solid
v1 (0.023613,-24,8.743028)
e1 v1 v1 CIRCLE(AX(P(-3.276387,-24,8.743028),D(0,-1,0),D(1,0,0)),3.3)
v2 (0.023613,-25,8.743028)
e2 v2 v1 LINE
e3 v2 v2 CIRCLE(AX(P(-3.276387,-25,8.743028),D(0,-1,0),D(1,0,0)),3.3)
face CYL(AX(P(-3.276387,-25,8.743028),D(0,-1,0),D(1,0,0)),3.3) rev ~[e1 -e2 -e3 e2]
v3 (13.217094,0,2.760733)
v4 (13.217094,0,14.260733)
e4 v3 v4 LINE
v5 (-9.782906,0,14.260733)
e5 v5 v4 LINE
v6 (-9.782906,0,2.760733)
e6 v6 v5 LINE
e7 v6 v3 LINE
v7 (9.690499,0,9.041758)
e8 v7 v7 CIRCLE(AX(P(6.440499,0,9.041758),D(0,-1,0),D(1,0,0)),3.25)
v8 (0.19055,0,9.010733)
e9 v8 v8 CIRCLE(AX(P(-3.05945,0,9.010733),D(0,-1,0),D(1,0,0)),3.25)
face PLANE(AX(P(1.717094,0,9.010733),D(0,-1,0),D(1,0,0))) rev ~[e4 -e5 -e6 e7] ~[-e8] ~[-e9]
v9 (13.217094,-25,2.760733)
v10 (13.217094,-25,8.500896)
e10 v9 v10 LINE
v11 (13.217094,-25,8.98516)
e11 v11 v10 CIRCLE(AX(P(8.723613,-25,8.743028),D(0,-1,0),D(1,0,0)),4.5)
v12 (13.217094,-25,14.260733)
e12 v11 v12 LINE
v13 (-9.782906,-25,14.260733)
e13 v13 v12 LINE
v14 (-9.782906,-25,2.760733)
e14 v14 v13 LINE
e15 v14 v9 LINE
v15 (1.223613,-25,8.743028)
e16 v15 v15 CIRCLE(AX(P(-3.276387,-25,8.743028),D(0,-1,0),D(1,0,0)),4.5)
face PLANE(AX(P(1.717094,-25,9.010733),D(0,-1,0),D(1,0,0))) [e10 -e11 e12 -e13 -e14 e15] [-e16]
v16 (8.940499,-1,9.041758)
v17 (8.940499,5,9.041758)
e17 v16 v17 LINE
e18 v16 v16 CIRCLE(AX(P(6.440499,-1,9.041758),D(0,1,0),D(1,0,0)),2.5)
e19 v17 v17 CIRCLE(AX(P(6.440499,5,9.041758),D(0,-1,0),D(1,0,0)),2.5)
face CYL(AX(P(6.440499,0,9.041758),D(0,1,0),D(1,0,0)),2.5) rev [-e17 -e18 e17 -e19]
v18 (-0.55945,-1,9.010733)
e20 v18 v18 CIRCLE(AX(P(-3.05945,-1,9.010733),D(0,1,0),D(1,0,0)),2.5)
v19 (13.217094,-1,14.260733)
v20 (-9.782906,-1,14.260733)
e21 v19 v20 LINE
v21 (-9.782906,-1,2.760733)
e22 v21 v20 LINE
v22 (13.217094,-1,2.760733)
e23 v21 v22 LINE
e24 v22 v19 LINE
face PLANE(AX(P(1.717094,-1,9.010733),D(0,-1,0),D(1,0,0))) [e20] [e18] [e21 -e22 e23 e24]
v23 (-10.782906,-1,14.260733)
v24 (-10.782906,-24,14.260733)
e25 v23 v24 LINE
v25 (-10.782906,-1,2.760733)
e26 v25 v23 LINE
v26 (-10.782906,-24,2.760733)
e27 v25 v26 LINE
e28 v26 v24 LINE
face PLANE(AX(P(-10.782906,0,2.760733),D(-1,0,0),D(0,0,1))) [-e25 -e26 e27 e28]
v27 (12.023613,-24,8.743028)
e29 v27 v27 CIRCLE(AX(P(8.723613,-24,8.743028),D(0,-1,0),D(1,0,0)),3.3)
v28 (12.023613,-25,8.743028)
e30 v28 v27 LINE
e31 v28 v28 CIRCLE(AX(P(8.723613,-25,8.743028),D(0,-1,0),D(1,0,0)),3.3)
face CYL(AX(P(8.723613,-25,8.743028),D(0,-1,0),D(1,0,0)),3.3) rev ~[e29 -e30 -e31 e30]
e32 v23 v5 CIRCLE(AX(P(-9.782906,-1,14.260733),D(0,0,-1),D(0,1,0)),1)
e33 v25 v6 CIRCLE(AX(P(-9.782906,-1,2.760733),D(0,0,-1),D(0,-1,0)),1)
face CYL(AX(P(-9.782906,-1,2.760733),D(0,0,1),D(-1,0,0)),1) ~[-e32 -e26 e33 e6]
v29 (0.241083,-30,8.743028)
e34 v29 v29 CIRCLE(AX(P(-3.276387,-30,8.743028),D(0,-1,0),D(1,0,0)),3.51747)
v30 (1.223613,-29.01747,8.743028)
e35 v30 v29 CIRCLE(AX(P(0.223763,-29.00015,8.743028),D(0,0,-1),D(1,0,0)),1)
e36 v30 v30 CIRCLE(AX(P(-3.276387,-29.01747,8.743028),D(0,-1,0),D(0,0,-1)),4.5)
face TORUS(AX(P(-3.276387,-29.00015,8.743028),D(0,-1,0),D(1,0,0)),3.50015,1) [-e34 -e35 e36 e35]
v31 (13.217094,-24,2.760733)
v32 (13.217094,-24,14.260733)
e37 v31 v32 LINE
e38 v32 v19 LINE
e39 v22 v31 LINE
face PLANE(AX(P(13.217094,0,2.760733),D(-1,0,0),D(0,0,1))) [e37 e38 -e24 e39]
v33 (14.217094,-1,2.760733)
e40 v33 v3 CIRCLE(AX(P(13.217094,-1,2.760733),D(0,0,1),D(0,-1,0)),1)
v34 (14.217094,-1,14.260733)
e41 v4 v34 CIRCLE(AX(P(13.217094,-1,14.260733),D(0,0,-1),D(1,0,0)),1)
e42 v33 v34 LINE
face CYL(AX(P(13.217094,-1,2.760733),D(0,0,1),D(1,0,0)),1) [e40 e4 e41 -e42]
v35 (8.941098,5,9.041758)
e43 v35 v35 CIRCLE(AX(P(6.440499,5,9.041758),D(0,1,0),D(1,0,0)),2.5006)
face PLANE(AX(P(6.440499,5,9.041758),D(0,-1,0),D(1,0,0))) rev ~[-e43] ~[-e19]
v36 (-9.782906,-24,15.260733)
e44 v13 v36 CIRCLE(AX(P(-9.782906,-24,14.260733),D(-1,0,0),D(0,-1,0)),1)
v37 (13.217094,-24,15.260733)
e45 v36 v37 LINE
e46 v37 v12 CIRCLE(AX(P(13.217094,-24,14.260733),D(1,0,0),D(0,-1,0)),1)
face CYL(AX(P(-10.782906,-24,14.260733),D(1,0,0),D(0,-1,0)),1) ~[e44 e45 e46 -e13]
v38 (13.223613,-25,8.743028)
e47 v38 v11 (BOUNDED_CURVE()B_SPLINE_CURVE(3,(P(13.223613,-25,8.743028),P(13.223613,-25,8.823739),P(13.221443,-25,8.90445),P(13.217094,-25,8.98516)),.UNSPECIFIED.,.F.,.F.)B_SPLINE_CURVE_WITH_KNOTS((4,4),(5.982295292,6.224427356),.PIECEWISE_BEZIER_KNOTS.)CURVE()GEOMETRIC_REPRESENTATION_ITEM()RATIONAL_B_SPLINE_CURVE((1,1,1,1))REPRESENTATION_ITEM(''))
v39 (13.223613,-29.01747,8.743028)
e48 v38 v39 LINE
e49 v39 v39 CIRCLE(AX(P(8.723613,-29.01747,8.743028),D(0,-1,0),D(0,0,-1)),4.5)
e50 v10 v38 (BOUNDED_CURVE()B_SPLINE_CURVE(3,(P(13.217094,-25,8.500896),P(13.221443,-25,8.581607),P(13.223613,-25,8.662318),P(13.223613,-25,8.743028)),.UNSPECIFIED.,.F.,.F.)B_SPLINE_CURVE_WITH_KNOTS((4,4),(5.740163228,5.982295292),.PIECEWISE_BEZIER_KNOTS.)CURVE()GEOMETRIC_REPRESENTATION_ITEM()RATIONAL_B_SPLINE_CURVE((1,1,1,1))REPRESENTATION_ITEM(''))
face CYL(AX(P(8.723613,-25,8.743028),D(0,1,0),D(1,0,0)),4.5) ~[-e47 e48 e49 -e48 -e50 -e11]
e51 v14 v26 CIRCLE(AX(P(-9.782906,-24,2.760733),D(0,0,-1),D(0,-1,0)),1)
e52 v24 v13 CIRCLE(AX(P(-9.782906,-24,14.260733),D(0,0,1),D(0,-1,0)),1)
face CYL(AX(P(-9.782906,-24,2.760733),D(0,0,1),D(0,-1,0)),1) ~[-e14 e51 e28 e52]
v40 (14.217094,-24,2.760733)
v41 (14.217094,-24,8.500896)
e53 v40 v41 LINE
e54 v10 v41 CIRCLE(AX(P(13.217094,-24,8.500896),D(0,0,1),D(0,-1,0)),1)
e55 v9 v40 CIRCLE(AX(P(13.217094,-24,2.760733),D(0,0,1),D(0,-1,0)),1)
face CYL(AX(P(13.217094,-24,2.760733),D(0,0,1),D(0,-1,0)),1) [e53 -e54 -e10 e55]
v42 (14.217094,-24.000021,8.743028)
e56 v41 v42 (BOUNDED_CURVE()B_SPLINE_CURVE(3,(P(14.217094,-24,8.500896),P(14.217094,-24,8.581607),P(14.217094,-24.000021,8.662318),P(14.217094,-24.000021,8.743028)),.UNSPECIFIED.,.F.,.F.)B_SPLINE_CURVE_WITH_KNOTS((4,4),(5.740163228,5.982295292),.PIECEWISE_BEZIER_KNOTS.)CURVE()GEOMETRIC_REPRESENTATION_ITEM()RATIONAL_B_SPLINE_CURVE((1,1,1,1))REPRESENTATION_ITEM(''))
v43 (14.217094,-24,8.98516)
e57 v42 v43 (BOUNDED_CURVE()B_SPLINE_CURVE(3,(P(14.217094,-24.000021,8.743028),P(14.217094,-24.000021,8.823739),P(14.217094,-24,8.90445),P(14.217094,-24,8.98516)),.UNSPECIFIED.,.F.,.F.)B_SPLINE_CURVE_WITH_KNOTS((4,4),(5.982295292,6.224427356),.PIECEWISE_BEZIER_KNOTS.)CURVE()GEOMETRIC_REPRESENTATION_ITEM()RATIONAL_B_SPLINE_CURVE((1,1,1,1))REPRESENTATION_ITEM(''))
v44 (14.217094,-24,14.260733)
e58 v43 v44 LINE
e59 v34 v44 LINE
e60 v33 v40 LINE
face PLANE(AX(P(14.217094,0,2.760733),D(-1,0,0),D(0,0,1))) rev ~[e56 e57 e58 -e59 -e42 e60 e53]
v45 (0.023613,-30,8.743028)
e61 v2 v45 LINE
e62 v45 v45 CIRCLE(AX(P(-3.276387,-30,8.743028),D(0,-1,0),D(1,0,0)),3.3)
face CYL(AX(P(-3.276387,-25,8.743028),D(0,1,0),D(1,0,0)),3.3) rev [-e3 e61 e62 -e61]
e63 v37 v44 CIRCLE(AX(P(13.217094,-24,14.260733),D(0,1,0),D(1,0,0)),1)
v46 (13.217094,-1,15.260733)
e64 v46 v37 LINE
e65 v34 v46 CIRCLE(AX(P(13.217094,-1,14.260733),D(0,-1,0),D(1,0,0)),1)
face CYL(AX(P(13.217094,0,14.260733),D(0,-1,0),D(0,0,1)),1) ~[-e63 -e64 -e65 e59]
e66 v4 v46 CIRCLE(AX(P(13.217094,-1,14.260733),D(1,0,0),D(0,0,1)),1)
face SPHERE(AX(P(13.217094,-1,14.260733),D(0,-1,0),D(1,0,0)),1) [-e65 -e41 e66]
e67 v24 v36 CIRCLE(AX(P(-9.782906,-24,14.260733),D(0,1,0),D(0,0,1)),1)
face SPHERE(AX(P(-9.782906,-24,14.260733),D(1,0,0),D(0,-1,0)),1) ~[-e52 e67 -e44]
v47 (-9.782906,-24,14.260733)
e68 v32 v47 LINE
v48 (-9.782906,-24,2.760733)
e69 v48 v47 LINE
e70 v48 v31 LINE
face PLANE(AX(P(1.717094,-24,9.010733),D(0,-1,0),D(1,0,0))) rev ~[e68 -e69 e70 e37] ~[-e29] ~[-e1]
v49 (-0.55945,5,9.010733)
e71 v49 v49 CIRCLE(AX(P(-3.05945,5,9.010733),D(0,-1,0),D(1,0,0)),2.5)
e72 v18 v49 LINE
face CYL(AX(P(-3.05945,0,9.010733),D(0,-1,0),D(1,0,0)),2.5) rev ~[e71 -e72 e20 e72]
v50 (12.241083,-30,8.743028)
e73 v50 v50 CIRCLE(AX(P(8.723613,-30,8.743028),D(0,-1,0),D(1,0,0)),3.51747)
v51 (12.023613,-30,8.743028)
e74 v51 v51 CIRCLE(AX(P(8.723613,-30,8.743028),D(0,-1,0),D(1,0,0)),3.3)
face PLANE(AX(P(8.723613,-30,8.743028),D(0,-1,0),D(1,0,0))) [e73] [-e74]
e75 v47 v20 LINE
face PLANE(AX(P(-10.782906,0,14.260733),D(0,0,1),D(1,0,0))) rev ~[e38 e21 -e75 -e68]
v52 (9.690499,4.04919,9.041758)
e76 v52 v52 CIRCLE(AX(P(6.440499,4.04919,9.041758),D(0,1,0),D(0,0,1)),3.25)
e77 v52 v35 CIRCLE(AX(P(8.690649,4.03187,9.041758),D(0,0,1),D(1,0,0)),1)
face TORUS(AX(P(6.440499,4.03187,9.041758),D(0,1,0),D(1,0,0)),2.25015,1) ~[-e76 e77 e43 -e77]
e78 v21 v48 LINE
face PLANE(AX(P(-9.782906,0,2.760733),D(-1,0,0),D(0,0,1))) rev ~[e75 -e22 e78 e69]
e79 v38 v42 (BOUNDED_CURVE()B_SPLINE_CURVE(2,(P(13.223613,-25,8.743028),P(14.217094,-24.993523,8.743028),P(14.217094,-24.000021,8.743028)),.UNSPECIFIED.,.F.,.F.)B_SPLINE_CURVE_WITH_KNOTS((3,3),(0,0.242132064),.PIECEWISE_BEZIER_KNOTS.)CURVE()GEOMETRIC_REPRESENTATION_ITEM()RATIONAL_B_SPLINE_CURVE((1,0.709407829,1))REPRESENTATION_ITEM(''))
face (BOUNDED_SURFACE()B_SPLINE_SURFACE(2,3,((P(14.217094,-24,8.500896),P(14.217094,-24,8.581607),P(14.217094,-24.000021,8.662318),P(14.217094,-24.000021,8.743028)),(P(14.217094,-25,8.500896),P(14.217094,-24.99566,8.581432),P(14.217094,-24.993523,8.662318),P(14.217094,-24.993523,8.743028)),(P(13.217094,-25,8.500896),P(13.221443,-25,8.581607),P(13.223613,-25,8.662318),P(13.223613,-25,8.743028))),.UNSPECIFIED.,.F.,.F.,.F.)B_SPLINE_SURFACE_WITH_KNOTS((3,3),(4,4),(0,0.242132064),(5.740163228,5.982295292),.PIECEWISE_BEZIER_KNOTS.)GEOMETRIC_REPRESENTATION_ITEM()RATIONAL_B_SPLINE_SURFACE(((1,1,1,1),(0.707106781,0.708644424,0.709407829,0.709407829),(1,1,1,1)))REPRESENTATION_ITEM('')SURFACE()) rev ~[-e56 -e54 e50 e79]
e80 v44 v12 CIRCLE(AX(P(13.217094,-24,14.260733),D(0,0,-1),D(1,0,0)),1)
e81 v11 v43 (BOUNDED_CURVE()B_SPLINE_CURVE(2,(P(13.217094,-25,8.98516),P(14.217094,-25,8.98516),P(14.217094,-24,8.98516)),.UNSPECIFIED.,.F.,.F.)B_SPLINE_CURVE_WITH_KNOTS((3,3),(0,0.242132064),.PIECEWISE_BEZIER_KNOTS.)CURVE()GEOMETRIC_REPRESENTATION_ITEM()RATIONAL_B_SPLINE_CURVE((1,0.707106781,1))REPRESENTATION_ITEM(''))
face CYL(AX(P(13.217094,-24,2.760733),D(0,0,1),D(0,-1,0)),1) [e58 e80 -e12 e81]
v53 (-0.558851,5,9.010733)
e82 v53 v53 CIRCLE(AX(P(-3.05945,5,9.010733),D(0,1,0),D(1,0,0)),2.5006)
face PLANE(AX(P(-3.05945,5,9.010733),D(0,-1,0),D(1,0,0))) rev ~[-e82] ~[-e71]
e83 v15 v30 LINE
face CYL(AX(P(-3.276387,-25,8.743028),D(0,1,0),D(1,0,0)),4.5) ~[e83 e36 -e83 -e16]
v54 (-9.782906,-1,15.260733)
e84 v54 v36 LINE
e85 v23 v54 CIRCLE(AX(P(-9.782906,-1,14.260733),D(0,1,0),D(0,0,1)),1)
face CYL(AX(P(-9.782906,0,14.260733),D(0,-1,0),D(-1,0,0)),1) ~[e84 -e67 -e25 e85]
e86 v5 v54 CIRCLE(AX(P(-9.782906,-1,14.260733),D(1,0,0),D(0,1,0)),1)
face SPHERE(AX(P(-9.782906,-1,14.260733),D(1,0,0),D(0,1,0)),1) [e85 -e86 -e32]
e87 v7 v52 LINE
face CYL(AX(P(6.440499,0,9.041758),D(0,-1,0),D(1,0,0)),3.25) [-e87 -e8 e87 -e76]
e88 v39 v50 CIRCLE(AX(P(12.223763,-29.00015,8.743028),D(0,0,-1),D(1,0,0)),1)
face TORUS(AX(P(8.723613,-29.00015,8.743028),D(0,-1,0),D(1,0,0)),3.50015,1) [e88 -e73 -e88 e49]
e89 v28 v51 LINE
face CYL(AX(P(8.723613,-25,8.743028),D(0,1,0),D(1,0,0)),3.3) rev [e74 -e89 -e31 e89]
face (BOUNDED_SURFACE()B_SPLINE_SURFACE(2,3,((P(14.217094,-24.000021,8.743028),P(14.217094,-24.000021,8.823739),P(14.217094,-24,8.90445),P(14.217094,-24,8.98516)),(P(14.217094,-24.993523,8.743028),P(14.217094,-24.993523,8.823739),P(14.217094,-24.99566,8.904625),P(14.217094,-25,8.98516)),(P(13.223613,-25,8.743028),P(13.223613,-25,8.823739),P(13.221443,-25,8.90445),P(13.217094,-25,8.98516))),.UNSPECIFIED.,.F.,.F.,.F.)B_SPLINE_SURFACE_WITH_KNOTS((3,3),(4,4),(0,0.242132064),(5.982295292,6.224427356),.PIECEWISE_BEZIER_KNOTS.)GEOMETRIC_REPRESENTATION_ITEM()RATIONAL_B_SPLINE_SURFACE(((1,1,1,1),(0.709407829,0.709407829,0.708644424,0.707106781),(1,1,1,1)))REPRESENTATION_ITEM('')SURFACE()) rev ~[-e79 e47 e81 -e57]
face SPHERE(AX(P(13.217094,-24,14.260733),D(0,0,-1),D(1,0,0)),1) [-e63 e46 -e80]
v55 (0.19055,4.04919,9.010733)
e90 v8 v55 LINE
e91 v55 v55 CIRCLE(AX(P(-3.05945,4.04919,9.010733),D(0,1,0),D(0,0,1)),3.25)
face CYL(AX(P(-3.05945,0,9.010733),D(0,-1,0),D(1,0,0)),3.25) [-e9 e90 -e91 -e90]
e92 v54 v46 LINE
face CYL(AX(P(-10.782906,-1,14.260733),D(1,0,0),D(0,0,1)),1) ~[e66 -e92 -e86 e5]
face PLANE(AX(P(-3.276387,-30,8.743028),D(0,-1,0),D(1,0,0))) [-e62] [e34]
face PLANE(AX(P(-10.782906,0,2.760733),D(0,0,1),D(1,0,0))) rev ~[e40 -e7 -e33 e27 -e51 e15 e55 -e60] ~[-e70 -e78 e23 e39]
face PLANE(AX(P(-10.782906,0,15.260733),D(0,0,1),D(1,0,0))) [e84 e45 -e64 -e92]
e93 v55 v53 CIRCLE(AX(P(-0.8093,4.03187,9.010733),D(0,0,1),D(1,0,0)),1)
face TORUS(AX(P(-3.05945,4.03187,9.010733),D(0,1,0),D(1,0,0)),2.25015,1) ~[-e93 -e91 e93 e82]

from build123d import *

# Parameters (mm, degrees)
F0_W     = 25
F0_H     = 12.5
F0_R     = 3.25
F0_R_2   = 2.5
F1_DEPTH = 25
F2_T     = -1
F3_DEPTH = 10
F4_DEPTH = 5
F5_R     = 3.3
F6_DEPTH = 10
F5_R_2   = 4.5
F7_DEPTH = 5
F8_R     = 1


# Not quite as in the source:
# - a fillet or chamfer that OpenCascade refuses, or shapes differently, is made with other operations: its cross-section is extruded or revolved along the edge and cut away or added


with BuildPart() as f1:
    # F0 (on Front) → F1 (new body)
    with BuildSketch(Plane.XZ):
        with Locations((1.7170939115, 9.0107331052)):
            Rectangle(F0_W, F0_H)
        with Locations((-3.0594504727, 9.0107331052)):
            Circle(F0_R, mode=Mode.SUBTRACT)
        with Locations((6.4404988661, 9.0417582542)):
            Circle(F0_R, mode=Mode.SUBTRACT)
        with Locations((-3.0594504727, 9.0107331052)):
            Circle(F0_R)
        with Locations((-3.0594504727, 9.0107331052)):
            Circle(F0_R_2, mode=Mode.SUBTRACT)
        with Locations((6.4404988661, 9.0417582542)):
            Circle(F0_R)
        with Locations((6.4404988661, 9.0417582542)):
            Circle(F0_R_2, mode=Mode.SUBTRACT)
        with Locations((-3.0594504727, 9.0107331052)):
            Circle(F0_R_2)
        with Locations((6.4404988661, 9.0417582542)):
            Circle(F0_R_2)
    extrude(amount=F1_DEPTH)

    # F2
    f2_openings = [f1.faces().sort_by_distance(p)[0] for p in [
        (1.717094, -12.5, 2.760733),
    ]]
    offset(amount=F2_T, openings=f2_openings)

    # F0 (on Front) → F3 (cut)
    with BuildSketch(Plane.XZ):
        with Locations((6.4404988661, 9.0417582542)):
            Circle(F0_R_2)
        with Locations((-3.0594504727, 9.0107331052)):
            Circle(F0_R_2)
    extrude(amount=F3_DEPTH, mode=Mode.SUBTRACT)

    # F0 (on Front) → F4 (join)
    with BuildSketch(Plane.XZ):
        with Locations((-3.0594504727, 9.0107331052)):
            Circle(F0_R)
        with Locations((-3.0594504727, 9.0107331052)):
            Circle(F0_R_2, mode=Mode.SUBTRACT)
        with Locations((6.4404988661, 9.0417582542)):
            Circle(F0_R)
        with Locations((6.4404988661, 9.0417582542)):
            Circle(F0_R_2, mode=Mode.SUBTRACT)
    extrude(amount=-F4_DEPTH)

    # F5 (on face) → F6 (cut)
    with BuildSketch(Plane.XZ.offset(25)):
        with Locations((-3.2763871515, 8.743028397)):
            Circle(F5_R)
        with Locations((8.7236128485, 8.743028397)):
            Circle(F5_R)
    extrude(amount=-F6_DEPTH, mode=Mode.SUBTRACT)

    # F5 (on face) → F7 (join)
    with BuildSketch(Plane.XZ.offset(25)):
        with Locations((-3.2763871515, 8.743028397)):
            Circle(F5_R_2)
        with Locations((-3.2763871515, 8.743028397)):
            Circle(F5_R, mode=Mode.SUBTRACT)
        with Locations((8.7236128485, 8.743028397)):
            Circle(F5_R_2)
        with Locations((8.7236128485, 8.743028397)):
            Circle(F5_R, mode=Mode.SUBTRACT)
    extrude(amount=F7_DEPTH)

    # F8
    f8_edges = [f1.edges().sort_by_distance(p)[0] for p in [
        (14.217094, -25, 9.010733),
        (14.217094, -12.5, 15.260733),
        (1.717094, -25, 15.260733),
        (-10.782906, -25, 9.010733),
        (14.217094, 0, 9.010733),
        (1.717094, 0, 15.260733),
        (-10.782906, 0, 9.010733),
        (-10.782906, -12.5, 15.260733),
    ]]
    fillet(f8_edges, radius=F8_R)

    # F9: fillet of radius 1 on 4 edges, made by hand

    # F9_s1 → F9_t2 (revolve, cut)
    with BuildSketch(Plane.XY.offset(9.0417582542)):
        with BuildLine():
            ThreePointArc((9.6906488661, 4.0318703599), (9.4811826994, 4.6442887287), (8.9405363493, 5.0001452412))
            Line((8.9405363493, 5.0001452412), (8.9455340989, 5.0195107389))
            ThreePointArc((8.9455340989, 5.0195107389), (9.3155176077, 5.02), (9.6904988661, 5.02))
            Line((9.6904988661, 5.02), (9.7104988661, 5))
            ThreePointArc((9.7104988661, 5), (9.7104988661, 4.51593518), (9.7106488661, 4.0318703599))
            Line((9.7106488661, 4.0318703599), (9.6906488661, 4.0318703599))
        make_face()
    revolve(axis=Axis((6.4404988661, 5, 9.0417582542), (0, -1, 0)), mode=Mode.SUBTRACT)

    # F9_s3 → F9_t4 (revolve, cut)
    with BuildSketch(Plane.XY.offset(9.0107331052)):
        with BuildLine():
            ThreePointArc((0.1906995273, 4.0318703599), (-0.0187666394, 4.6442887287), (-0.5594129896, 5.0001452412))
            Line((-0.5594129896, 5.0001452412), (-0.5544152399, 5.0195107389))
            ThreePointArc((-0.5544152399, 5.0195107389), (-0.1844317311, 5.02), (0.1905495273, 5.02))
            Line((0.1905495273, 5.02), (0.2105495273, 5))
            ThreePointArc((0.2105495273, 5), (0.2105495273, 4.51593518), (0.2106995273, 4.0318703599))
            Line((0.2106995273, 4.0318703599), (0.1906995273, 4.0318703599))
        make_face()
    revolve(axis=Axis((-3.0594504727, 5, 9.0107331052), (0, -1, 0)), mode=Mode.SUBTRACT)

    # F9_s5 → F9_t6 (revolve, cut)
    with BuildSketch(Plane.XY.offset(8.743028397)):
        with BuildLine():
            ThreePointArc((1.2237628485, -29.00015), (0.9308696297, -29.7072567812), (0.2237628485, -30.00015))
            Line((0.2237628485, -30.00015), (0.2237628485, -30.02015))
            ThreePointArc((0.2237628485, -30.02015), (0.7236878485, -30.02), (1.2236128485, -30.02))
            Line((1.2236128485, -30.02), (1.2436128485, -30))
            ThreePointArc((1.2436128485, -30), (1.2436128485, -29.500075), (1.2437628485, -29.00015))
            Line((1.2437628485, -29.00015), (1.2237628485, -29.00015))
        make_face()
    revolve(axis=Axis((-3.2763871515, -30, 8.743028397), (0, -1, 0)), mode=Mode.SUBTRACT)

    # F9_s7 → F9_t8 (revolve, cut)
    with BuildSketch(Plane.XY.offset(8.743028397)):
        with BuildLine():
            ThreePointArc((13.2237628485, -29.00015), (12.9308696297, -29.7072567812), (12.2237628485, -30.00015))
            Line((12.2237628485, -30.00015), (12.2237628485, -30.02015))
            ThreePointArc((12.2237628485, -30.02015), (12.7236878485, -30.02), (13.2236128485, -30.02))
            Line((13.2236128485, -30.02), (13.2436128485, -30))
            ThreePointArc((13.2436128485, -30), (13.2436128485, -29.500075), (13.2437628485, -29.00015))
            Line((13.2437628485, -29.00015), (13.2237628485, -29.00015))
        make_face()
    revolve(axis=Axis((8.7236128485, -30, 8.743028397), (0, -1, 0)), mode=Mode.SUBTRACT)


solid = f1.part
